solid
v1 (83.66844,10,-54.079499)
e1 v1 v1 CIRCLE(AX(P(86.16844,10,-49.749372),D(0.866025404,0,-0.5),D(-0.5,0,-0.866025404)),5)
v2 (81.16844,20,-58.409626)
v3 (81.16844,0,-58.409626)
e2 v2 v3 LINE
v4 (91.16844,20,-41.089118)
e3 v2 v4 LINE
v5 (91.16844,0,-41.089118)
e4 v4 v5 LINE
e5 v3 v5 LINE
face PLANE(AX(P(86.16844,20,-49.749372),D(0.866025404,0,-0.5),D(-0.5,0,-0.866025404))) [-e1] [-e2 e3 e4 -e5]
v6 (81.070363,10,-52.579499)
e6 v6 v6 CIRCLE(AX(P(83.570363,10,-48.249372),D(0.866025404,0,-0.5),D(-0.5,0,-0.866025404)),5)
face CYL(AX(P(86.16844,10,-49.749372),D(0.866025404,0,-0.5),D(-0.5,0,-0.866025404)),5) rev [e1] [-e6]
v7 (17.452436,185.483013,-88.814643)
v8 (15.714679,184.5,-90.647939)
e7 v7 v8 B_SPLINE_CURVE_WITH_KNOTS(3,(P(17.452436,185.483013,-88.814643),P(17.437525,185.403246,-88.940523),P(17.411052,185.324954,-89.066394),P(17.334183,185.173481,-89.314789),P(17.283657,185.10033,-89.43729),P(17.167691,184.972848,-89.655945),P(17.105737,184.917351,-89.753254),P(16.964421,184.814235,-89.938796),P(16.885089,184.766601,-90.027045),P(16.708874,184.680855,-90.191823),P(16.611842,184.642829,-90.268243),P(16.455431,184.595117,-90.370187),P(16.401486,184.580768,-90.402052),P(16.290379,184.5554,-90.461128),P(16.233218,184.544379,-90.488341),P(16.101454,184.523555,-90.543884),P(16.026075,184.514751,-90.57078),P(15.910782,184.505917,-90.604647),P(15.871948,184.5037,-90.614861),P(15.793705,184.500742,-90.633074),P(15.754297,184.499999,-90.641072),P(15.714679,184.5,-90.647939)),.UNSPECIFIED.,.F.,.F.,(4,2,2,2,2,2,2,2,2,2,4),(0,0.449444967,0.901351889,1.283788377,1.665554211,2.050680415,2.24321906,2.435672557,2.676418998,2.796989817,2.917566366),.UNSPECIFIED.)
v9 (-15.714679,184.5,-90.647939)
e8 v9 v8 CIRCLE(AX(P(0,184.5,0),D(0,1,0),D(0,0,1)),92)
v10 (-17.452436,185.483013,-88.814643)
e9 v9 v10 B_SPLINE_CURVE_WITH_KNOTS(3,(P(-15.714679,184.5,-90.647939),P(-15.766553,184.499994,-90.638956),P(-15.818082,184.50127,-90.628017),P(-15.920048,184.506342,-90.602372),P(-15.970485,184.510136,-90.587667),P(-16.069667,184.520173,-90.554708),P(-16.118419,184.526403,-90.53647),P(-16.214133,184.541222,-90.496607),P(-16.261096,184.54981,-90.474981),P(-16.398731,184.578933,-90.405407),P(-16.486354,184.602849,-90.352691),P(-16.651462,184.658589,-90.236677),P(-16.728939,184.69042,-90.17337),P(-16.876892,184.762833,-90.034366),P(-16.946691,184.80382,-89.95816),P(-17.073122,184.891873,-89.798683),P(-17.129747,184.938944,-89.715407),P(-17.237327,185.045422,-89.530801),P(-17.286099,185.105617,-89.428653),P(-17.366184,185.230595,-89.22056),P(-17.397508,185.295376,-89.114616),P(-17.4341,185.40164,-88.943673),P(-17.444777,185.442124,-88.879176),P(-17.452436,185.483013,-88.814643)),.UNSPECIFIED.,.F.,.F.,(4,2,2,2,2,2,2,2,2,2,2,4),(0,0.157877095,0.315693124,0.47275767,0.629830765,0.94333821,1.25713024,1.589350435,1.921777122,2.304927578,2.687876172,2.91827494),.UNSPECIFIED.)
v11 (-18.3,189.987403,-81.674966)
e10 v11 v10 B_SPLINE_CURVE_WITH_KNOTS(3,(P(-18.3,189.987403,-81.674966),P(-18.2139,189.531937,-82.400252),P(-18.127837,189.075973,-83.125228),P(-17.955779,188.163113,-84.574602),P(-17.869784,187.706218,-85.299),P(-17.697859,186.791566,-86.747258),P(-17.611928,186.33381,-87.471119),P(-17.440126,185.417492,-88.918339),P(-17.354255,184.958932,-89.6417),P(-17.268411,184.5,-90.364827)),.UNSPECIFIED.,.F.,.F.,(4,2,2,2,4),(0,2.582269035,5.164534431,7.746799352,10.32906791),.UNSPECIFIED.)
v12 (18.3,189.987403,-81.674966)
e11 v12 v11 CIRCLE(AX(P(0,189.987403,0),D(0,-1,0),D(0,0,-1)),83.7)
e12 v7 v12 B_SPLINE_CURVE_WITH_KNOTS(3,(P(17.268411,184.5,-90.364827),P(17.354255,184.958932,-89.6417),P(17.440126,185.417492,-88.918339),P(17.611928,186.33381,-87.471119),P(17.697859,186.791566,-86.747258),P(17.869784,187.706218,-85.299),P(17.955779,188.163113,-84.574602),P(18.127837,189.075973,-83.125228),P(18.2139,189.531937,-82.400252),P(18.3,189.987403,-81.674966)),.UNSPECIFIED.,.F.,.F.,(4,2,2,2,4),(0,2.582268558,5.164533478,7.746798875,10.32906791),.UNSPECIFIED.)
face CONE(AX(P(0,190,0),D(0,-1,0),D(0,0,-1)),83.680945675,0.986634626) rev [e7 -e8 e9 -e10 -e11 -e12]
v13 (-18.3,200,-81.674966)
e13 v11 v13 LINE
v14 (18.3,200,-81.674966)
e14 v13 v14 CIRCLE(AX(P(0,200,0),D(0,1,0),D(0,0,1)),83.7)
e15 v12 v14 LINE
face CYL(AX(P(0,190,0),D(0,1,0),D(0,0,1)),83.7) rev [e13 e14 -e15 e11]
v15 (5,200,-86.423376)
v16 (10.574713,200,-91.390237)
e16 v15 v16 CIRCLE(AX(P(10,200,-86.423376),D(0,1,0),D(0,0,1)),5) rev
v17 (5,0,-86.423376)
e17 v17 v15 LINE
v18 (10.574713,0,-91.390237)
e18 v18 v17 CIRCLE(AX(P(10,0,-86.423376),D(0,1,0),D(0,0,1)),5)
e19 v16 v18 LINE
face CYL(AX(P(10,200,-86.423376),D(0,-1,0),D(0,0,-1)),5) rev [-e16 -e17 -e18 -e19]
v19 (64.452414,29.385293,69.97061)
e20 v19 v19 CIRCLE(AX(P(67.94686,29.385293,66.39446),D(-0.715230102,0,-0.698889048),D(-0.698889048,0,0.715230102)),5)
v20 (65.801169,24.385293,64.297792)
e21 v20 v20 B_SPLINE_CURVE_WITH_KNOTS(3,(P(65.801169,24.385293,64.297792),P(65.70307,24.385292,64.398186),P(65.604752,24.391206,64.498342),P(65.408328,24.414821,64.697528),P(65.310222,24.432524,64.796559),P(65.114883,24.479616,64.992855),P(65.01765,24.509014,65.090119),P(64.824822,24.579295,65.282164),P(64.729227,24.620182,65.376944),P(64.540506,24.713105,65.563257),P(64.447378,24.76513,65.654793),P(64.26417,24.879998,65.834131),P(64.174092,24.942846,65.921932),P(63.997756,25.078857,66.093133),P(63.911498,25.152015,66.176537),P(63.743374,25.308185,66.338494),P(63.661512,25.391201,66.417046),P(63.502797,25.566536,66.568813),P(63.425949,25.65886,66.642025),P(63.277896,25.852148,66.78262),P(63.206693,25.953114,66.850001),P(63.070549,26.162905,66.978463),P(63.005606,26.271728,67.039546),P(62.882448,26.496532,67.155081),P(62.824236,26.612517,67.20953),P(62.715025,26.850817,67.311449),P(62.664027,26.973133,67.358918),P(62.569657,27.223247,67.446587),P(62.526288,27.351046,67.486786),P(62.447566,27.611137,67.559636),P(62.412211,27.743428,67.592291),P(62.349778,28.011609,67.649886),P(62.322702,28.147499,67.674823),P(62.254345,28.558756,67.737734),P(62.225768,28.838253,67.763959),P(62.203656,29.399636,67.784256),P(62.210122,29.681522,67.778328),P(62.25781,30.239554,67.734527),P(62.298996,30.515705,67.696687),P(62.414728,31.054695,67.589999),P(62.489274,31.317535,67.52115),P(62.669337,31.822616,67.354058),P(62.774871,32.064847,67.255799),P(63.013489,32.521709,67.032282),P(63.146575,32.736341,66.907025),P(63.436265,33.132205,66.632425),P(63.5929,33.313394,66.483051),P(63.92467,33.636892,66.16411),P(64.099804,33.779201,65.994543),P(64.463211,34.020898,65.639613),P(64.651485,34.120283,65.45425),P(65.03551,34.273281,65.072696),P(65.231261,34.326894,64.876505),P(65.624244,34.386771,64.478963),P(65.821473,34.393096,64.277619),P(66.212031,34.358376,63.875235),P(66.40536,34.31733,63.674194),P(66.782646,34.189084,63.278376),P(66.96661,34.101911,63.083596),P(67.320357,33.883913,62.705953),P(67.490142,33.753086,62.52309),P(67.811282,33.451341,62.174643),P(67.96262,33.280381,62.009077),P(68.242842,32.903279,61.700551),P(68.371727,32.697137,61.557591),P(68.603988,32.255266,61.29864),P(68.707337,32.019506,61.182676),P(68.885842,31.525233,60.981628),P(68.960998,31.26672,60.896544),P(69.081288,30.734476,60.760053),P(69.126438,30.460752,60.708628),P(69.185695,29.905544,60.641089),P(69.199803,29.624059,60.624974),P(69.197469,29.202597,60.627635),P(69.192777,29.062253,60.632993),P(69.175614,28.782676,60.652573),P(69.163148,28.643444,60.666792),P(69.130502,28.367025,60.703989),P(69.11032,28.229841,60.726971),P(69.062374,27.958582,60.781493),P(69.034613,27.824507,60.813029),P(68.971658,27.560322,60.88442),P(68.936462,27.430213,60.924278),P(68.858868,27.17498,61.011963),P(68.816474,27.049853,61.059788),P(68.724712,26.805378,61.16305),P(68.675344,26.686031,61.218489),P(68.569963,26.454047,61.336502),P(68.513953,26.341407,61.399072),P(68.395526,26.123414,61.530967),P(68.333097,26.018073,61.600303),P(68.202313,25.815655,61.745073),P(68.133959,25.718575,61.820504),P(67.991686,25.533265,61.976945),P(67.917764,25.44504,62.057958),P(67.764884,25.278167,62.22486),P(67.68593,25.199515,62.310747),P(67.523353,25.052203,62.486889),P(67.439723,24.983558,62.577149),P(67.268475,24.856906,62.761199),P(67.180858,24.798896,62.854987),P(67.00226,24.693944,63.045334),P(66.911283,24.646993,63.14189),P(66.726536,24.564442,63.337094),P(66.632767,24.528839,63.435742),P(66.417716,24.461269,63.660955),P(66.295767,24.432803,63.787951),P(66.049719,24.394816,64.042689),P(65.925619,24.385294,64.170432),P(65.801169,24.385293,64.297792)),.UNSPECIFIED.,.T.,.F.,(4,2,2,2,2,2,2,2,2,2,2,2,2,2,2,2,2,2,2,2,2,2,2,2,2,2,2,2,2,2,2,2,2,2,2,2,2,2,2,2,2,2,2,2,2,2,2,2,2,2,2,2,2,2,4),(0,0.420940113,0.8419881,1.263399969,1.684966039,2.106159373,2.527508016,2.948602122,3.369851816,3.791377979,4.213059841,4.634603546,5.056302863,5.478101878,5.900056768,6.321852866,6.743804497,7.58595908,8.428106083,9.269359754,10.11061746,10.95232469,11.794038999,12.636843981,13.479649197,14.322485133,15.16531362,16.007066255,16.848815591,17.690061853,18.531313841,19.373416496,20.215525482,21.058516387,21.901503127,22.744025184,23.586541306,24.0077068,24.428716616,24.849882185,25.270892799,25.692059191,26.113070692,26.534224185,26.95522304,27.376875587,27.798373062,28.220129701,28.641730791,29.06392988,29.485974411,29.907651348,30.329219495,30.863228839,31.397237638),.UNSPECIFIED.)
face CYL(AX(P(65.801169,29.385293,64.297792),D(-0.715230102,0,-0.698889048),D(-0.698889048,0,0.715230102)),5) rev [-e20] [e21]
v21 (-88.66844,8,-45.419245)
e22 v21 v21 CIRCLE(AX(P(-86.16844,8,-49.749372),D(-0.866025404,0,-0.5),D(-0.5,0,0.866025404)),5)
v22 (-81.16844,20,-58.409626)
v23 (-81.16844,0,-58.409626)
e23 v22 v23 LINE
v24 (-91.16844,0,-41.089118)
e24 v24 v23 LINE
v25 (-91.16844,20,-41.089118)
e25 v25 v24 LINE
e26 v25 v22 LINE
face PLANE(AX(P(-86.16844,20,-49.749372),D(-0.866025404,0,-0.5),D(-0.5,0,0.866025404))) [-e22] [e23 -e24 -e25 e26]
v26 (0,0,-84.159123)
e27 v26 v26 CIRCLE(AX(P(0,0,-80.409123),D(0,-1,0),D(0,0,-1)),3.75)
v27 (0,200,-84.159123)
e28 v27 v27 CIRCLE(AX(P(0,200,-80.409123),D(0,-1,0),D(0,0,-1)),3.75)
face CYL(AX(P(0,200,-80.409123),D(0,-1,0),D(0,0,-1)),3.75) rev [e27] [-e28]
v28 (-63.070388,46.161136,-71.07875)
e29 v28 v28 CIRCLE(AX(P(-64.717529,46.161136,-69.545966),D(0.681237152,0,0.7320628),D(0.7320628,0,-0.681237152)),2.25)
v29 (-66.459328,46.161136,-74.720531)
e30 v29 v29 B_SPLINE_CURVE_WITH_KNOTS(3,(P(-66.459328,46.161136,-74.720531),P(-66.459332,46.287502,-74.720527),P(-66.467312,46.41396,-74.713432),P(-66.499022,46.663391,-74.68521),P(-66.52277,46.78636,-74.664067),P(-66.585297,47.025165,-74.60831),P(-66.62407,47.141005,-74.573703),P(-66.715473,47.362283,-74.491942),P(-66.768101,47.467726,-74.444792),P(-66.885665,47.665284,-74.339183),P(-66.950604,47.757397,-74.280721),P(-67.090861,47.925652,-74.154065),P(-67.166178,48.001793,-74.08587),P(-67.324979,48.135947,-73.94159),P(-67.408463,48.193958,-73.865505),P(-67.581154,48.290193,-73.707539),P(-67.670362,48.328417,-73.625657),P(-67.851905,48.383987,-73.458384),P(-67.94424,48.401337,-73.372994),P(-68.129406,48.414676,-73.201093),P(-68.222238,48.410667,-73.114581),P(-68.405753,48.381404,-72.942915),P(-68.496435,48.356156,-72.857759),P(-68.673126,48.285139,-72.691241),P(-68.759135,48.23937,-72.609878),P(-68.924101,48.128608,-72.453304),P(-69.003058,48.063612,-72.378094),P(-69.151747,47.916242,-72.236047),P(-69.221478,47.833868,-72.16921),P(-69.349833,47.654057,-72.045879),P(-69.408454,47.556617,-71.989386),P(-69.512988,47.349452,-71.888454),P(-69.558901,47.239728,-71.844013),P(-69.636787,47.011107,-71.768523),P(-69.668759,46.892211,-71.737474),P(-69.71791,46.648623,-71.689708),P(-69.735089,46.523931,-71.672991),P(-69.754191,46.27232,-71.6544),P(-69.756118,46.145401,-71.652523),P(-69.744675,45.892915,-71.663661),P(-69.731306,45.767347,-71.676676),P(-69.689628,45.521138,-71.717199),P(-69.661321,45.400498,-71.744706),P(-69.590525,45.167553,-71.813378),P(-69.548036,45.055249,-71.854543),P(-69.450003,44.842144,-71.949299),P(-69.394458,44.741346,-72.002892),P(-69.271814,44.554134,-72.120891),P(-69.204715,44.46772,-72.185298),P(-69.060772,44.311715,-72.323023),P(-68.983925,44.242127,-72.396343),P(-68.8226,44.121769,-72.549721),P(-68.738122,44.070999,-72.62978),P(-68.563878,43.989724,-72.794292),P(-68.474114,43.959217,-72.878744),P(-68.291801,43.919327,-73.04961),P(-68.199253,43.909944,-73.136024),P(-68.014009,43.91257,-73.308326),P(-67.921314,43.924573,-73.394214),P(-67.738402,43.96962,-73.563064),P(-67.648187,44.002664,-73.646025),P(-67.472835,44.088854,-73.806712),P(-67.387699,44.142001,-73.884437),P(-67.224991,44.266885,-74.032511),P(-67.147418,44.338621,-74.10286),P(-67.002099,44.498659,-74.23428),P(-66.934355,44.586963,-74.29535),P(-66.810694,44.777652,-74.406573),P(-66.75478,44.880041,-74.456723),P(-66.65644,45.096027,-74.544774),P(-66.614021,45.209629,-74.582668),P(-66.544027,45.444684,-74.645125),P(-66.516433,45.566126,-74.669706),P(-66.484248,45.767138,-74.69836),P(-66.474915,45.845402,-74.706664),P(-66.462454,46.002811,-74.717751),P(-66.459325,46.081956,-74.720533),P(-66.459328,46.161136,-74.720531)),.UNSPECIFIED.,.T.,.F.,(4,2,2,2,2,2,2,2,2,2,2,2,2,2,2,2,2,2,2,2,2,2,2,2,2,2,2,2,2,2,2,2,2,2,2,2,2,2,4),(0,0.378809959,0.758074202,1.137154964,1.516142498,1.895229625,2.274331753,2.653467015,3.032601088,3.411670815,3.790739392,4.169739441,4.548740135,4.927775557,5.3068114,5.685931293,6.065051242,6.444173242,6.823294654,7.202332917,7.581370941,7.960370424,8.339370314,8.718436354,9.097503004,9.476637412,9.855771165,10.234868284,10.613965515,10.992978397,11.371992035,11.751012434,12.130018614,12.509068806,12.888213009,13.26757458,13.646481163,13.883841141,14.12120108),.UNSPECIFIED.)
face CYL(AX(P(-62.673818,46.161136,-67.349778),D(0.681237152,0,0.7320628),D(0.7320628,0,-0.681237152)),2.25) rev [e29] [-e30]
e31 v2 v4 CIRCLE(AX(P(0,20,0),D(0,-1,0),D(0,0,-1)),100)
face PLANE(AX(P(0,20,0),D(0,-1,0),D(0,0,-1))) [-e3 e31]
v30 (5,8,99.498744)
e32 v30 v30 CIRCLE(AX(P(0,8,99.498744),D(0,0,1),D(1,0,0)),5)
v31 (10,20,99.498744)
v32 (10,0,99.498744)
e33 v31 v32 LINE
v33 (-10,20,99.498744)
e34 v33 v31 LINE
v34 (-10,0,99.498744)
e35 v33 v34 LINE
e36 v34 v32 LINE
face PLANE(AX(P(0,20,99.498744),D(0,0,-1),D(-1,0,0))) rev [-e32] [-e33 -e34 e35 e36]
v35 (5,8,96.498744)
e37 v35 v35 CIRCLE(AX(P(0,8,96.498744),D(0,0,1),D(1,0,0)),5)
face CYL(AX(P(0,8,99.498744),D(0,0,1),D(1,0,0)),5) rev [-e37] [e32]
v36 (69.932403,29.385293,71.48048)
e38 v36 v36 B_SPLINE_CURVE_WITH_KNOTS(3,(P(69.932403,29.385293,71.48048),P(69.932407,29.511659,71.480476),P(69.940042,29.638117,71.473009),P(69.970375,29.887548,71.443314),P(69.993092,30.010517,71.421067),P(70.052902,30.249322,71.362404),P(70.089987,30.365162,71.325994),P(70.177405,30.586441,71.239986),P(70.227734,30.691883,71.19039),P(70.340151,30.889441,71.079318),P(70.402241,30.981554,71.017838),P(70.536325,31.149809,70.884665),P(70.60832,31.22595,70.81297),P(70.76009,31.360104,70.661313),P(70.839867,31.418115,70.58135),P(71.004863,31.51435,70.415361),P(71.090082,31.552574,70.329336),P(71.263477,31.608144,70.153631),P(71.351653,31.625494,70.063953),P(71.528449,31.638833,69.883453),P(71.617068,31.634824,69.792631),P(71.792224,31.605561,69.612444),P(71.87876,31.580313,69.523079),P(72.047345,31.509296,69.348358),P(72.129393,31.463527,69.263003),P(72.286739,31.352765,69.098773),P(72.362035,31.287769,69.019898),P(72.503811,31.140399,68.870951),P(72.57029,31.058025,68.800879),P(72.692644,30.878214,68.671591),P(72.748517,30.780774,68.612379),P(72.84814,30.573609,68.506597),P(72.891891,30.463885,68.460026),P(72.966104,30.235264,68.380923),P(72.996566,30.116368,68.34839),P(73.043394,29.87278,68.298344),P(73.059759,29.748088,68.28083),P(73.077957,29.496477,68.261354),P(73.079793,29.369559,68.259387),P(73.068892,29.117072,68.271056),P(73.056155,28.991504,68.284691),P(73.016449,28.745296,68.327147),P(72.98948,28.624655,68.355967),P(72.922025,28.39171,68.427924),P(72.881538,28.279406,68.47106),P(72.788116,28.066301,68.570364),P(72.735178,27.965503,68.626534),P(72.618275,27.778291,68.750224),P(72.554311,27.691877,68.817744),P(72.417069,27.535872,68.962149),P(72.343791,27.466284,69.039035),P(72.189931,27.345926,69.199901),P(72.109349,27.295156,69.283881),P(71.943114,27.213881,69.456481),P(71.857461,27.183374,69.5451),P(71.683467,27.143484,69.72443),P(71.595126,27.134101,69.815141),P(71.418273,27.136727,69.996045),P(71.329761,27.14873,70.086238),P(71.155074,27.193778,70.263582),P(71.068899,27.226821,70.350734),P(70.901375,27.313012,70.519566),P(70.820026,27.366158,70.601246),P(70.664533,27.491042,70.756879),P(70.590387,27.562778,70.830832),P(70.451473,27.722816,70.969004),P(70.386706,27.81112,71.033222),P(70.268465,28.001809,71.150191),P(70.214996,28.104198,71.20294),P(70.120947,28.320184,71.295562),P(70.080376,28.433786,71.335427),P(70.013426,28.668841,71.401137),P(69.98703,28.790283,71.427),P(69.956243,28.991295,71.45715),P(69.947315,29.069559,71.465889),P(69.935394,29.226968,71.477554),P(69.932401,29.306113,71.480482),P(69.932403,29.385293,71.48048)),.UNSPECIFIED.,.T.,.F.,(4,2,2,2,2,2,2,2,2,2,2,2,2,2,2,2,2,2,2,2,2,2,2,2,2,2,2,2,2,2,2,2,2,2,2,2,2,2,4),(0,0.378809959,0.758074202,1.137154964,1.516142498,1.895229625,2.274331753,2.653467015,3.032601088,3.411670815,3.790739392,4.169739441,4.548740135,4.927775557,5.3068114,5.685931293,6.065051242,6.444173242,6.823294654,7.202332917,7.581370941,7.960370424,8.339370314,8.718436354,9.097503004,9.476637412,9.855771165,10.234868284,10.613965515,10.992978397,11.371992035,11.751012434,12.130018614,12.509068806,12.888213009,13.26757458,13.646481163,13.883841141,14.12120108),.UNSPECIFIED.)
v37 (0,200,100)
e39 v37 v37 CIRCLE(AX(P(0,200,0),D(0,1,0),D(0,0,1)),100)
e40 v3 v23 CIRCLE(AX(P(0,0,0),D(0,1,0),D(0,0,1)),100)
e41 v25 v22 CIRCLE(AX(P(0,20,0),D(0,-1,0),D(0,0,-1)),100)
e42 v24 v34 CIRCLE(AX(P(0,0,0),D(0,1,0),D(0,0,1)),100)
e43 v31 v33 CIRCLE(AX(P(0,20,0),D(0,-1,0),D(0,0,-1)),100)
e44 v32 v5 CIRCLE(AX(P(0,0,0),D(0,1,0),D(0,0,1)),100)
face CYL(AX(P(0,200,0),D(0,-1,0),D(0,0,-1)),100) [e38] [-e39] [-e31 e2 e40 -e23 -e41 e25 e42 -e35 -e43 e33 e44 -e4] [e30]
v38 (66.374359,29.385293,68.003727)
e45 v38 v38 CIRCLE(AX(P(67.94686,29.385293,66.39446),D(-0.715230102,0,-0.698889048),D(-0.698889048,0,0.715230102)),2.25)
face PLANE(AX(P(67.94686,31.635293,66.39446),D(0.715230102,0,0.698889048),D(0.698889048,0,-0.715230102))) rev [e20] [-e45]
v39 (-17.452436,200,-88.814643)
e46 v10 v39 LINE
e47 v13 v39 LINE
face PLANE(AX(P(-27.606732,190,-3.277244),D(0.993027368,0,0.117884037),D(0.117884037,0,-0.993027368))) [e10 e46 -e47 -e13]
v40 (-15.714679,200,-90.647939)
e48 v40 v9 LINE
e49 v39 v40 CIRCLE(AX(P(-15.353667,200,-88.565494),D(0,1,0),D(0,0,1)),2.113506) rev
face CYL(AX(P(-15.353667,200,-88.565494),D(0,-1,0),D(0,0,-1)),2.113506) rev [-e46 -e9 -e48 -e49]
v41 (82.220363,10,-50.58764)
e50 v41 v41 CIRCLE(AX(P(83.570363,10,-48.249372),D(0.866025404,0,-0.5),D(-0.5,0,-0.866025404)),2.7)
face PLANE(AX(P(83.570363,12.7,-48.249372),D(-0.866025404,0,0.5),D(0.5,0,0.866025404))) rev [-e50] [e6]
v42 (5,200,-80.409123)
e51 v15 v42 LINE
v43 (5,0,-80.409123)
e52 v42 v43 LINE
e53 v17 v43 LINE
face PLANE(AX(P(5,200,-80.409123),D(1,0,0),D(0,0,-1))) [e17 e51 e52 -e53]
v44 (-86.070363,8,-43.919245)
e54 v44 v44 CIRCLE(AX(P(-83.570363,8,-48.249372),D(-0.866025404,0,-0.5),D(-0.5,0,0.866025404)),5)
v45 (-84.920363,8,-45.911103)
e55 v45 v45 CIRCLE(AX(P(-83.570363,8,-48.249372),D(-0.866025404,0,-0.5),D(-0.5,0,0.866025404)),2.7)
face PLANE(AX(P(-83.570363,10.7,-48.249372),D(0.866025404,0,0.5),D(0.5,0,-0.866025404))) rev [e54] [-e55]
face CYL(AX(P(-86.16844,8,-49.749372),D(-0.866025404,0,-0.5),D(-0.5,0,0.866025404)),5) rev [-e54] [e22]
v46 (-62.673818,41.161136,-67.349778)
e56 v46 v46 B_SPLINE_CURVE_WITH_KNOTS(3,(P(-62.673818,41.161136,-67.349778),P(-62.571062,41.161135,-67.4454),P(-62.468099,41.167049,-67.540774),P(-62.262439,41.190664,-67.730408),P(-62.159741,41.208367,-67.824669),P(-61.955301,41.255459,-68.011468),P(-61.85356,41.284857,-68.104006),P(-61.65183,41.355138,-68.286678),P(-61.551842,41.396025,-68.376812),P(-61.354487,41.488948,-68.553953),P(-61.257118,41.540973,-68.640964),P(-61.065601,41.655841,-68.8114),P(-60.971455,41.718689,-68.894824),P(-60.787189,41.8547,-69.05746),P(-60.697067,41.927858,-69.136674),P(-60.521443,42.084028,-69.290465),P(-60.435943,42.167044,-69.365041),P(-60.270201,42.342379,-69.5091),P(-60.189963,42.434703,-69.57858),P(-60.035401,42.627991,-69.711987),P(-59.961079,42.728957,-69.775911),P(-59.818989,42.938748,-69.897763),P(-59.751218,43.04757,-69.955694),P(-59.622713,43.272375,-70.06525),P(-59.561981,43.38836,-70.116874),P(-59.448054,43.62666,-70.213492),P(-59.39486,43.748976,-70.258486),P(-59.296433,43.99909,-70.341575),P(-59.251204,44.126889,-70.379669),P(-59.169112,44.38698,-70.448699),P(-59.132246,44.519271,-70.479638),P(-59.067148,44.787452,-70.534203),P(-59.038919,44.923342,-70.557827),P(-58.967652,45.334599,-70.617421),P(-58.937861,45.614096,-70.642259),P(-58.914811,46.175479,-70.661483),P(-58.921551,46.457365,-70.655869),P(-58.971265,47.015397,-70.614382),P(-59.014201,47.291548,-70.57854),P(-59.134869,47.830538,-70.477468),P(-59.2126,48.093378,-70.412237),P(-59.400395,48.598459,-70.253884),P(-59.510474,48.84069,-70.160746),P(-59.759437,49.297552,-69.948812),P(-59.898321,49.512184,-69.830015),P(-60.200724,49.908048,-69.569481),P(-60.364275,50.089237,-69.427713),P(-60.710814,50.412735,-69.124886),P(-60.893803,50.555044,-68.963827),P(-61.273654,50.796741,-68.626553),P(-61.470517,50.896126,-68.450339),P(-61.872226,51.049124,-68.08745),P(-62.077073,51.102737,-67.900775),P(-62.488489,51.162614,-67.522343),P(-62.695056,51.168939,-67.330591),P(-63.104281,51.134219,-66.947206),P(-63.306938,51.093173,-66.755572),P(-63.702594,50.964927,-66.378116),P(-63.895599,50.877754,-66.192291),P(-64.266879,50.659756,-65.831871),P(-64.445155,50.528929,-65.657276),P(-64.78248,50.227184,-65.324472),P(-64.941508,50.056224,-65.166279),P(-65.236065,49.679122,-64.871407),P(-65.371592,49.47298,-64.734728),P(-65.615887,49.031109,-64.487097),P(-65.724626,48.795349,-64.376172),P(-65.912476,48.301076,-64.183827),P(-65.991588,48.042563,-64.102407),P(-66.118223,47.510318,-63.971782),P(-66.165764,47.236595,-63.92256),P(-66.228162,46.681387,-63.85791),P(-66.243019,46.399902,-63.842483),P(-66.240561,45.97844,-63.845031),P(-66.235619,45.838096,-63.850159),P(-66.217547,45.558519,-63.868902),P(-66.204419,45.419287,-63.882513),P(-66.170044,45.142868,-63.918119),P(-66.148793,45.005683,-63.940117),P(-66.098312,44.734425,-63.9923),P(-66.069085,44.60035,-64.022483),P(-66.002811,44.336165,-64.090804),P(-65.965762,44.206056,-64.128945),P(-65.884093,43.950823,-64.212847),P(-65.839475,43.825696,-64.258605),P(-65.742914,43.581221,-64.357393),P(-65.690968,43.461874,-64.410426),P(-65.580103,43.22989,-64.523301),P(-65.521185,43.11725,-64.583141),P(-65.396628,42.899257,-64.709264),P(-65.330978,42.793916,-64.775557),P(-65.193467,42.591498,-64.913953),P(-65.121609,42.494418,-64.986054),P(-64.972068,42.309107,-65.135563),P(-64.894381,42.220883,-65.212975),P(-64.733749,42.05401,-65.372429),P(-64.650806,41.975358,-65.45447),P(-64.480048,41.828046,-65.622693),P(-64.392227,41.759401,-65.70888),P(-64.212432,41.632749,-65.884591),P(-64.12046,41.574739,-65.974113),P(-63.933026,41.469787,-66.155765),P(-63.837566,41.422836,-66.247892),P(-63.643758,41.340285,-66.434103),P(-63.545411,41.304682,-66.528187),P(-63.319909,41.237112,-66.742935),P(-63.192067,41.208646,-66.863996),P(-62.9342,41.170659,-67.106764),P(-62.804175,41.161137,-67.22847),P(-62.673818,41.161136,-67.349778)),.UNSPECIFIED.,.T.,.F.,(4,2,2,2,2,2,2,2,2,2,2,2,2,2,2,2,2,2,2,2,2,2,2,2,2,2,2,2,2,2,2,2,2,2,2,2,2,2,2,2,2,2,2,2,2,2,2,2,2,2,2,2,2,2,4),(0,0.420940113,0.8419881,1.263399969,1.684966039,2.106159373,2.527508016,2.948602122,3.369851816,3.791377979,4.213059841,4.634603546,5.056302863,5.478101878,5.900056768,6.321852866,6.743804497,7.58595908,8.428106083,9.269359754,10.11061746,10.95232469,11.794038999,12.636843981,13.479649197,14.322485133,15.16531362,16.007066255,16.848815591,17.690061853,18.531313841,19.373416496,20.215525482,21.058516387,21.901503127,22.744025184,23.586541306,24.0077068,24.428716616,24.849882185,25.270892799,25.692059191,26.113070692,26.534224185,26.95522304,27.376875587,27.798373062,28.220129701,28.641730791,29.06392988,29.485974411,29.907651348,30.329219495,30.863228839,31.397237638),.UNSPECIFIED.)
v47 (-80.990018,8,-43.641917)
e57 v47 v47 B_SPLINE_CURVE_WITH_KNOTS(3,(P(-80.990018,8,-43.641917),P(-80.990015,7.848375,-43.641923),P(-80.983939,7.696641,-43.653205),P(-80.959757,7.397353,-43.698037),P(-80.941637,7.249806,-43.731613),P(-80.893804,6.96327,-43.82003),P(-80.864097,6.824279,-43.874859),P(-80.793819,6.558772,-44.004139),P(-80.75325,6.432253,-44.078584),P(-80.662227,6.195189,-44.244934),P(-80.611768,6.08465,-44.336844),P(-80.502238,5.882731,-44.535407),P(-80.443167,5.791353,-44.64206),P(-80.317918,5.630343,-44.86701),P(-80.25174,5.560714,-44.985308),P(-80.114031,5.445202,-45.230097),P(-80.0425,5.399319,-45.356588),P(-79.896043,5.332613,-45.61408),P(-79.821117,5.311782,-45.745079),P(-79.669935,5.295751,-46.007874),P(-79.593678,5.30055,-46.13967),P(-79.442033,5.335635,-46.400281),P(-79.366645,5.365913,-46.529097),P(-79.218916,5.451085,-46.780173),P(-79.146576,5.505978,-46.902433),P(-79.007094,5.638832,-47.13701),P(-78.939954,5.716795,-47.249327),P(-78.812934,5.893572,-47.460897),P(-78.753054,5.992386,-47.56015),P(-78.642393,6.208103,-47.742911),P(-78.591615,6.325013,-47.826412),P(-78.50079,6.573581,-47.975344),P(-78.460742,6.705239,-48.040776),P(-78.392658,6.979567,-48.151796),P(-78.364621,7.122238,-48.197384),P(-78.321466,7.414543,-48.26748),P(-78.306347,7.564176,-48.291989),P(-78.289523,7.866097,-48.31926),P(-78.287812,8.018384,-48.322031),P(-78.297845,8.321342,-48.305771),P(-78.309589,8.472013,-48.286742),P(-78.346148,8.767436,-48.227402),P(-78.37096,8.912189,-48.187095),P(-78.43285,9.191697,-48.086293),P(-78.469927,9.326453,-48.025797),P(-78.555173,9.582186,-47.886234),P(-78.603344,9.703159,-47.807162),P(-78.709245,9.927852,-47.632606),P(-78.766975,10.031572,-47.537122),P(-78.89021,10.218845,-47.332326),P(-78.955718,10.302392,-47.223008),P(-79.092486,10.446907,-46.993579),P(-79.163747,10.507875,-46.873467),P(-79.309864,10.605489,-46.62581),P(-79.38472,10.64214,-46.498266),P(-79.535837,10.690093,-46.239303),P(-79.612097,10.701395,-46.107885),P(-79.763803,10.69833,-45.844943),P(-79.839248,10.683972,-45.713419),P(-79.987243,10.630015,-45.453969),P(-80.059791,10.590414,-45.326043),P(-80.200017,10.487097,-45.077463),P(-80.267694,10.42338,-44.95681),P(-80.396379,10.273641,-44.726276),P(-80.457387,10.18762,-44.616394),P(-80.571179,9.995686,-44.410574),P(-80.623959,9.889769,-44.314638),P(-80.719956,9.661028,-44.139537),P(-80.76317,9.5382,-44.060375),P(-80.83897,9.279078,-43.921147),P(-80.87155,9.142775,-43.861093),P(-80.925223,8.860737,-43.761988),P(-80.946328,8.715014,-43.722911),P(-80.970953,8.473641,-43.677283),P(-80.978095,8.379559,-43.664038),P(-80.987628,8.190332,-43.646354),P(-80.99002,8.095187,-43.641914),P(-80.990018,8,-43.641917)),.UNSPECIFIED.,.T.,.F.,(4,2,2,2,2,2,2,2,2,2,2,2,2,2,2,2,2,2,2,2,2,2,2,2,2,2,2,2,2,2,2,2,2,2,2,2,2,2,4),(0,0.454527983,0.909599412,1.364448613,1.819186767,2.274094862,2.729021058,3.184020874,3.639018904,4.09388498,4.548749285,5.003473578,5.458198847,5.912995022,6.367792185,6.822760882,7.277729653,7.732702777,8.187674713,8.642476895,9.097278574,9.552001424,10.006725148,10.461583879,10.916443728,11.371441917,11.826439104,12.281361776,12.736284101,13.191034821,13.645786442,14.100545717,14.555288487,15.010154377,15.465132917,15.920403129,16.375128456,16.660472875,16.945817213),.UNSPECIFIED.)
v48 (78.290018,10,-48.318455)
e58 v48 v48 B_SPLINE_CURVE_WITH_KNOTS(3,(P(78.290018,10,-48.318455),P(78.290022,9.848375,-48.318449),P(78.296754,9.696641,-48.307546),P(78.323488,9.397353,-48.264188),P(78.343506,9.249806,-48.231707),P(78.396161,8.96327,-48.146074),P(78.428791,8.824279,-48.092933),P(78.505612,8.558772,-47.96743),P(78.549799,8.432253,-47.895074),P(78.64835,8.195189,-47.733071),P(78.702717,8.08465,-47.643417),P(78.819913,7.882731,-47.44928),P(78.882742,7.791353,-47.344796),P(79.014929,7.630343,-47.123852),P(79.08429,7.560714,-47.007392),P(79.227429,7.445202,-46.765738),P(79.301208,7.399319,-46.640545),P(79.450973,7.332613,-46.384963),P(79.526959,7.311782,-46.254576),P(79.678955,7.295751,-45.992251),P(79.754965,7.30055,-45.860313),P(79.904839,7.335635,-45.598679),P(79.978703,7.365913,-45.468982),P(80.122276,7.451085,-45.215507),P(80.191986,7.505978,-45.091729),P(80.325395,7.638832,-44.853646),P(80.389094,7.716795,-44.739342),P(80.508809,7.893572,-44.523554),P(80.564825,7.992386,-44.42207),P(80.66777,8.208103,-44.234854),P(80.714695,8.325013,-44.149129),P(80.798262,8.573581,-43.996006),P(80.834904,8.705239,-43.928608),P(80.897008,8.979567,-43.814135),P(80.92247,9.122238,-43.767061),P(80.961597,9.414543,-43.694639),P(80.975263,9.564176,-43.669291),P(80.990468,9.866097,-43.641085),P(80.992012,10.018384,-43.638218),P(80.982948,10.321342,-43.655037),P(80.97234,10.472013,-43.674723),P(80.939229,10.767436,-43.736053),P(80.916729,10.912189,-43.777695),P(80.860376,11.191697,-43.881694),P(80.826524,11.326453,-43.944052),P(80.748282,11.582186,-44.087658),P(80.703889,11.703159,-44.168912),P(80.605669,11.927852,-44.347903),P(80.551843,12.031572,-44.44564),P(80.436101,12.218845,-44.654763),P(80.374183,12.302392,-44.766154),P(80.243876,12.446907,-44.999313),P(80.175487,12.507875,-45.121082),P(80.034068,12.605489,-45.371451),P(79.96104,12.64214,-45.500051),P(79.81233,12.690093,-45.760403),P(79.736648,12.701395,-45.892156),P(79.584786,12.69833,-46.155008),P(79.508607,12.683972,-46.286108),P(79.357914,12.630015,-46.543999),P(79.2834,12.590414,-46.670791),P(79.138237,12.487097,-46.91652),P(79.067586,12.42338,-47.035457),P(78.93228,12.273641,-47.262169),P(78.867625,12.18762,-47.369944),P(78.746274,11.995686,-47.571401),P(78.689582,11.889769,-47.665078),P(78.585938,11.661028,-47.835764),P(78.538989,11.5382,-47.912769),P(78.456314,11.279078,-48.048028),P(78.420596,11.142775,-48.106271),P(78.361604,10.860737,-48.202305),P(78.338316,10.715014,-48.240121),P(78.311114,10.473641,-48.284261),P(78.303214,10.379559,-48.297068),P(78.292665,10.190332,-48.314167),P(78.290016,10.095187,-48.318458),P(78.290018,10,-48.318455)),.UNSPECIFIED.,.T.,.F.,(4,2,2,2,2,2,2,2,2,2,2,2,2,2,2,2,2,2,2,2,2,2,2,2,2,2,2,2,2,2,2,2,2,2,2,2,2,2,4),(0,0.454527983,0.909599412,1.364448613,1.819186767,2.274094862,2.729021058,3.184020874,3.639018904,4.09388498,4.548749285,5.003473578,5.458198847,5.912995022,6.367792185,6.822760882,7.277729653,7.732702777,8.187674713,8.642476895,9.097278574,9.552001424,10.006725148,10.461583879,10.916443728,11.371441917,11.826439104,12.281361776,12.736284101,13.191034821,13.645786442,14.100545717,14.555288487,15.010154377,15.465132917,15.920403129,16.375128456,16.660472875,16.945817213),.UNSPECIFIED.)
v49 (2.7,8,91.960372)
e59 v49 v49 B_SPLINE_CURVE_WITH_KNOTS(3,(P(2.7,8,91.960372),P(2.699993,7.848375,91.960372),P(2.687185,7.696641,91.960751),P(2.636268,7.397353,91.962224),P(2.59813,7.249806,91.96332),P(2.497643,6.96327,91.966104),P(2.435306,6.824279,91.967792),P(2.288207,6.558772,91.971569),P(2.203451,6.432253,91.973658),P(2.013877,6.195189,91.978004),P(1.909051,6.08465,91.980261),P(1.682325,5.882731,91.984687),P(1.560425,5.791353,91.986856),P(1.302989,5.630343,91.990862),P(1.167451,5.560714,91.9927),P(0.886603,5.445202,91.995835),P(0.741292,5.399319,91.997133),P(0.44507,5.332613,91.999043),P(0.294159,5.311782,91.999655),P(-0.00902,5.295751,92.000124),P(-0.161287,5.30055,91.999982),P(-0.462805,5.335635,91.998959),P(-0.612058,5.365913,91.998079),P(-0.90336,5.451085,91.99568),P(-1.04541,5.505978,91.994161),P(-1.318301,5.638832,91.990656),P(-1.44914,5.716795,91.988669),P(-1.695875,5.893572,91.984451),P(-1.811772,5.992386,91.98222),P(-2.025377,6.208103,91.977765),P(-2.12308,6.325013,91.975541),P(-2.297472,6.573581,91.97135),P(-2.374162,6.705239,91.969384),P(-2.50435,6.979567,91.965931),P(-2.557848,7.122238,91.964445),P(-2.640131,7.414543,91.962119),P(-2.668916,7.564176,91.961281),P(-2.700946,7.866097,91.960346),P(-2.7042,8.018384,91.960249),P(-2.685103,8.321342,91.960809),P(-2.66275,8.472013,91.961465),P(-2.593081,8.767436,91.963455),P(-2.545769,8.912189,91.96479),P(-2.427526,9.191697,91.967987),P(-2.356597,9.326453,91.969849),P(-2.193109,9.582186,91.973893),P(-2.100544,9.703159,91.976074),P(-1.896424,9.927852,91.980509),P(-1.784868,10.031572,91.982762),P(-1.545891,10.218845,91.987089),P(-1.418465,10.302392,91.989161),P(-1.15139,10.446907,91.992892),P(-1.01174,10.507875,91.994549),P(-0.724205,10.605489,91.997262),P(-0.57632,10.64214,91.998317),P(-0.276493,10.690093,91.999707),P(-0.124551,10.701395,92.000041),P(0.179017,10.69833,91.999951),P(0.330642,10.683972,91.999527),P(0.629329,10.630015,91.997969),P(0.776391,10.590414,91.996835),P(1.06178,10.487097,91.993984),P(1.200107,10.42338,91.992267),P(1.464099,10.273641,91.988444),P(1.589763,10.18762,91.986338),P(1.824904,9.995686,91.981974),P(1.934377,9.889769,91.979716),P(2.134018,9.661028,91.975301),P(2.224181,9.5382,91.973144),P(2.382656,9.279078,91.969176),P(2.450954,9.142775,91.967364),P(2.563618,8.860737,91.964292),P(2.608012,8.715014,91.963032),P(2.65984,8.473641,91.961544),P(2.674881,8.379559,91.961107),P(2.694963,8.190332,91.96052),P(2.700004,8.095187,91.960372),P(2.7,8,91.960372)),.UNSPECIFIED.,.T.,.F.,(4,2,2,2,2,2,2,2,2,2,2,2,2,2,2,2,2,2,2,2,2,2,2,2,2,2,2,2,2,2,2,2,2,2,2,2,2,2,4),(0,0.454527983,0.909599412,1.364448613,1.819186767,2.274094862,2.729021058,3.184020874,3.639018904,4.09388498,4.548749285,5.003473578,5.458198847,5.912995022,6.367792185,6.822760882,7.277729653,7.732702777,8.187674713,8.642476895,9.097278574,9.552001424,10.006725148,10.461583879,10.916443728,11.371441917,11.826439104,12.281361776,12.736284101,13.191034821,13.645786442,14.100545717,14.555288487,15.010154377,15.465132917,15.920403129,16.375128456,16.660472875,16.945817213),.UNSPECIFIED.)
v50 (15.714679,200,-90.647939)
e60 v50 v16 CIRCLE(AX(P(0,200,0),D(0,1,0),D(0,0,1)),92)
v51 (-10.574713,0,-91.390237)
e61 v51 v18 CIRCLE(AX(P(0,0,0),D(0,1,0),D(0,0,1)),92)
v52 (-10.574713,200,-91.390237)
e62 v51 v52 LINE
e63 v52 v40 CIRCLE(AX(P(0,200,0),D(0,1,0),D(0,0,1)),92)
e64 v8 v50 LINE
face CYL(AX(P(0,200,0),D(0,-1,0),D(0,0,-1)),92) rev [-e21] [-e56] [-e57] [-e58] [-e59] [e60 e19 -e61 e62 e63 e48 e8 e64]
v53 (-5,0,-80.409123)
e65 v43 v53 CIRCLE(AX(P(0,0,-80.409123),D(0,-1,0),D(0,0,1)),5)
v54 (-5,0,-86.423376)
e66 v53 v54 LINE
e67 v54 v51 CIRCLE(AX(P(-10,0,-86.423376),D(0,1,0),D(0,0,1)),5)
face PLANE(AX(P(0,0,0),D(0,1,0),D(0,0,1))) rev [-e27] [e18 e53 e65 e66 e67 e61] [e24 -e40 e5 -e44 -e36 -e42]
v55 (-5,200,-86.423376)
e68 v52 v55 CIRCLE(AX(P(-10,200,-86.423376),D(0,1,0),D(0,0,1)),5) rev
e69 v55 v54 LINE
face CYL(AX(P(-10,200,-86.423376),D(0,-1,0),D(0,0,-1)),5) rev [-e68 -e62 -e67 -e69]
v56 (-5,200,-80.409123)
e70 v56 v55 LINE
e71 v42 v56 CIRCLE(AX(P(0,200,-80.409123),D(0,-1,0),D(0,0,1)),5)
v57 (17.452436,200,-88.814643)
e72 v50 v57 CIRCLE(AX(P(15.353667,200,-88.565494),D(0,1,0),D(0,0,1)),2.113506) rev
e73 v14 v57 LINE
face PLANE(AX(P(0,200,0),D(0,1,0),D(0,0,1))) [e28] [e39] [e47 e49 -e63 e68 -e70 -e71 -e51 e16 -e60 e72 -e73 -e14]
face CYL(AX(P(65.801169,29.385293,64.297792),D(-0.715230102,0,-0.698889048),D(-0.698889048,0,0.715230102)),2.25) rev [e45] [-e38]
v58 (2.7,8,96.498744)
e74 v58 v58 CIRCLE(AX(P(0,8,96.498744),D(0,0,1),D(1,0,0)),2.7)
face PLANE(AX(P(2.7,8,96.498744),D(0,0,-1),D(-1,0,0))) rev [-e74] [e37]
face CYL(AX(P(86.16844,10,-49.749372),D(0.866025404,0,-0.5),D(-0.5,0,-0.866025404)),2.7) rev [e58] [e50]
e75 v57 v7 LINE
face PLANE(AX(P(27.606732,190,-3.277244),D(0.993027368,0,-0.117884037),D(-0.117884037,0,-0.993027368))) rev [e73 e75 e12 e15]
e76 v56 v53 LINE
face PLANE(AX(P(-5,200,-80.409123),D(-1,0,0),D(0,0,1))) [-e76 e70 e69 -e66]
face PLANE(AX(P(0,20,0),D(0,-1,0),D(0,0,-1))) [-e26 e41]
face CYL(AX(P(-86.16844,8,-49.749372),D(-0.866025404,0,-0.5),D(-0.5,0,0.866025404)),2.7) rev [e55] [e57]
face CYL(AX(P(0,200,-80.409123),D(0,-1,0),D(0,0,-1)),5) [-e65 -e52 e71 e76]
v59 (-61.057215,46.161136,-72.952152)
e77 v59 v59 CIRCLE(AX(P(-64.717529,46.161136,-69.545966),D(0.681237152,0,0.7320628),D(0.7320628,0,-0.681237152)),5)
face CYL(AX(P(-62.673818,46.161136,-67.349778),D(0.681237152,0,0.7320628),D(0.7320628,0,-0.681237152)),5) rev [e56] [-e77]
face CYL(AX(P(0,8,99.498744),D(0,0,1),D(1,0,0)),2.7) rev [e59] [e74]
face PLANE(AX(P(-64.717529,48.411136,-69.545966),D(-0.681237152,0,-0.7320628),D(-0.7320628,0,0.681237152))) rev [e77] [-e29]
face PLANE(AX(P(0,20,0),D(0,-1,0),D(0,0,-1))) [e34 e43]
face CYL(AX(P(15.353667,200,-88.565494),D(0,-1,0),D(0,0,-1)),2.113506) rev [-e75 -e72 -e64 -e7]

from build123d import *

# Parameters (mm, degrees)
SCHIZZO1_R                                           = 100
ESTRUSIONE_ESTRUSIONE1_DEPTH                         = 200
RACCORDO1_R                                          = 5
ESTRUSIONE_ESTRUSIONE2_START                         = -10
ESTRUSIONE_ESTRUSIONE2_DEPTH                         = 10
SMUSSO1_START                                        = 184.4999999
SMUSSO1_DEPTH                                        = 5.5000001
SMUSSO1_2_ANGLE                                      = 338.362808
RACCORDO2_R                                          = 2.113506
SCHIZZO6_R                                           = 3.75
TAGLIO_ESTRUSIONE1_DEPTH                             = 200
TAGLIO_ESTRUSIONE2_DEPTH                             = 20
FORO_LAMATO_PER_BULLONE_M5_A_TESTA_ESAGO_D           = 5.4
FORO_LAMATO_PER_BULLONE_M5_A_TESTA_ESAGO_DEPTH       = 30
FORO_LAMATO_PER_BULLONE_M5_A_TESTA_ESAGO_CBORE_D     = 10
FORO_LAMATO_PER_BULLONE_M5_A_TESTA_ESAGO_CBORE_DEPTH = 3
FORO_LAMATO_PER_BULLONE_M5_A_TESTA_ESAGO_TIP         = 1.622323671
FORO_LAMATO_PER_BULLONE_M5_A_TESTA_E_2_D             = 5.4
FORO_LAMATO_PER_BULLONE_M5_A_TESTA_E_2_DEPTH         = 30
FORO_LAMATO_PER_BULLONE_M5_A_TESTA_E_2_CBORE_D       = 10
FORO_LAMATO_PER_BULLONE_M5_A_TESTA_E_2_CBORE_DEPTH   = 3
FORO_LAMATO_PER_BULLONE_M5_A_TESTA_E_2_TIP           = 1.622323671
FORO_LAMATO_PER_BULLONE_M5_A_TESTA_E_3_D             = 5.4
FORO_LAMATO_PER_BULLONE_M5_A_TESTA_E_3_DEPTH         = 30
FORO_LAMATO_PER_BULLONE_M5_A_TESTA_E_3_CBORE_D       = 10
FORO_LAMATO_PER_BULLONE_M5_A_TESTA_E_3_CBORE_DEPTH   = 3
FORO_LAMATO_PER_BULLONE_M5_A_TESTA_E_3_TIP           = 1.622323671
FORO_LAMATO_PER_VITE_M4_A_TESTA_ESAGONAL_D           = 4.5
FORO_LAMATO_PER_VITE_M4_A_TESTA_ESAGONAL_DEPTH       = 30
FORO_LAMATO_PER_VITE_M4_A_TESTA_ESAGONAL_CBORE_D     = 10
FORO_LAMATO_PER_VITE_M4_A_TESTA_ESAGONAL_CBORE_DEPTH = 3
FORO_LAMATO_PER_VITE_M4_A_TESTA_ESAGONAL_TIP         = 1.351936393
FORO_LAMATO_PER_VITE_M4_A_TESTA_ESAG_2_D             = 4.5
FORO_LAMATO_PER_VITE_M4_A_TESTA_ESAG_2_DEPTH         = 30
FORO_LAMATO_PER_VITE_M4_A_TESTA_ESAG_2_CBORE_D       = 10
FORO_LAMATO_PER_VITE_M4_A_TESTA_ESAG_2_CBORE_DEPTH   = 3
FORO_LAMATO_PER_VITE_M4_A_TESTA_ESAG_2_TIP           = 1.351936393


with BuildPart() as part:
    # Schizzo1 → Estrusione-Estrusione1 (new body)
    with BuildSketch(Plane(origin=(0, 0, 0), x_dir=(1, 0, 0), z_dir=(0, 1, 0))):
        with Locations(Location((0, 0, 0), (0, 0, 270))):
            Circle(SCHIZZO1_R)
        with BuildLine():
            Line((-5, 80.409122957), (-5, 91.864029957))
            ThreePointArc((-5, 91.864029957), (0, -92), (5, 91.864029957))
            Line((5, 91.864029957), (5, 80.409122957))
            ThreePointArc((5, 80.409122957), (0, 75.409122957), (-5, 80.409122957))
        make_face(mode=Mode.SUBTRACT)
    extrude(amount=ESTRUSIONE_ESTRUSIONE1_DEPTH)

    # Raccordo1
    raccordo1_edges = [part.edges().sort_by_distance(p)[0] for p in [
        (-5, 100, -91.864029957),
        (5, 100, -91.864029957),
    ]]
    fillet(raccordo1_edges, radius=RACCORDO1_R)

    # Schizzo2 → Estrusione-Estrusione2 (add)
    with BuildSketch(Plane(origin=(0, 200, 0), x_dir=(1, 0, 0), z_dir=(0, 1, 0)).offset(ESTRUSIONE_ESTRUSIONE2_START)):
        with BuildLine():
            ThreePointArc((18.3, 81.674965565), (0, -83.7), (-18.3, 81.674965565))
            Line((-18.3, 81.674965565), (-17.268411156, 90.364827096))
            ThreePointArc((-17.268411156, 90.364827096), (-58.631502512, -70.89673415), (92, 0))
            ThreePointArc((92, 0), (70.89673415, 58.631502512), (17.268411156, 90.364827096))
            Line((17.268411156, 90.364827096), (18.3, 81.674965565))
        make_face()
    extrude(amount=ESTRUSIONE_ESTRUSIONE2_DEPTH)

    # Smusso1: read off the stored shape, not the designer's step
    # Smusso1 outline → Smusso1 (add)
    with BuildSketch(Plane(origin=(0, 0, 0), x_dir=(1, 0, 0), z_dir=(0, 1, 0)).offset(SMUSSO1_START)):
        with BuildLine():
            Line((17.268411156, 90.364827097), (18.3, 81.674965565))
            ThreePointArc((18.3, 81.674965565), (0, -83.7), (-18.3, 81.674965565))
            Line((-18.3, 81.674965565), (-17.268411156, 90.364827097))
            ThreePointArc((-17.268411156, 90.364827097), (0, -92), (17.268411156, 90.364827097))
        make_face()
    extrude(amount=SMUSSO1_DEPTH)

    # Smusso1 2 outline → Smusso1 2 (revolve, cut)
    with BuildSketch(Plane(origin=(0, 0, 0), x_dir=(-0.18770012126264535, 0, -0.9822263814813712), z_dir=(0.9822263814813712, 0, -0.18770012126264535))):
        Polygon((92, 184.5), (83.7, 189.98740256), (83.7, 184.4999999), align=None)
    revolve(axis=Axis((0, 0, 0), (0, 1, 0)), revolution_arc=SMUSSO1_2_ANGLE, mode=Mode.SUBTRACT)

    # Raccordo2
    raccordo2_edges = [part.edges().sort_by_distance(p)[0] for p in [
        (17.268411156, 195, -90.364827096),
        (-17.268411156, 195, -90.364827096),
    ]]
    fillet(raccordo2_edges, radius=RACCORDO2_R)

    # Schizzo6 → Taglio-Estrusione1 (cut)
    with BuildSketch(Plane.XZ):
        with Locations(Location((0, -80.409122957, 0), (0, 0, 270))):
            Circle(SCHIZZO6_R)
    extrude(amount=-TAGLIO_ESTRUSIONE1_DEPTH, mode=Mode.SUBTRACT)

    # Schizzo7 → Taglio-Estrusione2 (cut)
    with BuildSketch(Plane.XZ):
        with BuildLine():
            ThreePointArc((10, 99.498743711), (0, 100), (-10, 99.498743711))
            Line((-10, 99.498743711), (10, 99.498743711))
        make_face()
        with BuildLine():
            ThreePointArc((81.168439698, -58.409625893), (86.602540378, -50), (91.168439698, -41.089117817))
            Line((91.168439698, -41.089117817), (81.168439698, -58.409625893))
        make_face()
        with BuildLine():
            Line((-81.168439698, -58.409625893), (-91.168439698, -41.089117817))
            ThreePointArc((-91.168439698, -41.089117817), (-86.602540378, -50), (-81.168439698, -58.409625893))
        make_face()
    extrude(amount=-TAGLIO_ESTRUSIONE2_DEPTH, mode=Mode.SUBTRACT)

    # Foro lamato per Bullone M5 a testa esago
    with Locations(Plane(origin=(86.168439698, 0, -49.749371855), x_dir=(-0.4999999999999976, 0, -0.86602540378444), z_dir=(0.8660254037844402, 0, -0.4999999999999977))):
        with Locations((0, 10)):
            CounterBoreHole(FORO_LAMATO_PER_BULLONE_M5_A_TESTA_ESAGO_D / 2, FORO_LAMATO_PER_BULLONE_M5_A_TESTA_ESAGO_CBORE_D / 2, FORO_LAMATO_PER_BULLONE_M5_A_TESTA_ESAGO_CBORE_DEPTH, depth=FORO_LAMATO_PER_BULLONE_M5_A_TESTA_ESAGO_DEPTH)
            with Locations((0, 0, -(FORO_LAMATO_PER_BULLONE_M5_A_TESTA_ESAGO_DEPTH + FORO_LAMATO_PER_BULLONE_M5_A_TESTA_ESAGO_TIP / 2))):  # 118° drill point
                Cone(0, FORO_LAMATO_PER_BULLONE_M5_A_TESTA_ESAGO_D / 2, FORO_LAMATO_PER_BULLONE_M5_A_TESTA_ESAGO_TIP, mode=Mode.SUBTRACT)

    # Foro lamato per Bullone M5 a testa e 2
    with Locations(Plane(origin=(-86.168439698, 0, -49.749371855), x_dir=(-0.5000000000000044, 0, 0.8660254037844362), z_dir=(-0.8660254037844362, 0, -0.5000000000000044))):
        with Locations((0, 8)):
            CounterBoreHole(FORO_LAMATO_PER_BULLONE_M5_A_TESTA_E_2_D / 2, FORO_LAMATO_PER_BULLONE_M5_A_TESTA_E_2_CBORE_D / 2, FORO_LAMATO_PER_BULLONE_M5_A_TESTA_E_2_CBORE_DEPTH, depth=FORO_LAMATO_PER_BULLONE_M5_A_TESTA_E_2_DEPTH)
            with Locations((0, 0, -(FORO_LAMATO_PER_BULLONE_M5_A_TESTA_E_2_DEPTH + FORO_LAMATO_PER_BULLONE_M5_A_TESTA_E_2_TIP / 2))):  # 118° drill point
                Cone(0, FORO_LAMATO_PER_BULLONE_M5_A_TESTA_E_2_D / 2, FORO_LAMATO_PER_BULLONE_M5_A_TESTA_E_2_TIP, mode=Mode.SUBTRACT)

    # Foro lamato per Bullone M5 a testa e 3
    with Locations(Plane.XY.offset(99.498743711)):
        with Locations((0, 8)):
            CounterBoreHole(FORO_LAMATO_PER_BULLONE_M5_A_TESTA_E_3_D / 2, FORO_LAMATO_PER_BULLONE_M5_A_TESTA_E_3_CBORE_D / 2, FORO_LAMATO_PER_BULLONE_M5_A_TESTA_E_3_CBORE_DEPTH, depth=FORO_LAMATO_PER_BULLONE_M5_A_TESTA_E_3_DEPTH)
            with Locations((0, 0, -(FORO_LAMATO_PER_BULLONE_M5_A_TESTA_E_3_DEPTH + FORO_LAMATO_PER_BULLONE_M5_A_TESTA_E_3_TIP / 2))):  # 118° drill point
                Cone(0, FORO_LAMATO_PER_BULLONE_M5_A_TESTA_E_3_D / 2, FORO_LAMATO_PER_BULLONE_M5_A_TESTA_E_3_TIP, mode=Mode.SUBTRACT)

    # Foro lamato per Vite M4 a testa esagonale-1
    with Locations(Plane(origin=(65.801169357, 29.385293, 64.297792429), x_dir=(0.698889048141, 0, -0.715230101707), z_dir=(-0.715230101707, 0, -0.698889048141))):
        with Locations((0, 0)):
            CounterBoreHole(FORO_LAMATO_PER_VITE_M4_A_TESTA_ESAGONAL_D / 2, FORO_LAMATO_PER_VITE_M4_A_TESTA_ESAGONAL_CBORE_D / 2, FORO_LAMATO_PER_VITE_M4_A_TESTA_ESAGONAL_CBORE_DEPTH, depth=FORO_LAMATO_PER_VITE_M4_A_TESTA_ESAGONAL_DEPTH)
            with Locations((0, 0, -(FORO_LAMATO_PER_VITE_M4_A_TESTA_ESAGONAL_DEPTH + FORO_LAMATO_PER_VITE_M4_A_TESTA_ESAGONAL_TIP / 2))):  # 118° drill point
                Cone(0, FORO_LAMATO_PER_VITE_M4_A_TESTA_ESAGONAL_D / 2, FORO_LAMATO_PER_VITE_M4_A_TESTA_ESAGONAL_TIP, mode=Mode.SUBTRACT)

    # Foro lamato per Vite M4 a testa esag 2
    with Locations(Plane(origin=(-62.673817972, 46.161135949, -67.349777585), x_dir=(0.732062968471, 0, -0.68123697066), z_dir=(0.68123697066, 0, 0.732062968471))):
        with Locations((0, 0)):
            CounterBoreHole(FORO_LAMATO_PER_VITE_M4_A_TESTA_ESAG_2_D / 2, FORO_LAMATO_PER_VITE_M4_A_TESTA_ESAG_2_CBORE_D / 2, FORO_LAMATO_PER_VITE_M4_A_TESTA_ESAG_2_CBORE_DEPTH, depth=FORO_LAMATO_PER_VITE_M4_A_TESTA_ESAG_2_DEPTH)
            with Locations((0, 0, -(FORO_LAMATO_PER_VITE_M4_A_TESTA_ESAG_2_DEPTH + FORO_LAMATO_PER_VITE_M4_A_TESTA_ESAG_2_TIP / 2))):  # 118° drill point
                Cone(0, FORO_LAMATO_PER_VITE_M4_A_TESTA_ESAG_2_D / 2, FORO_LAMATO_PER_VITE_M4_A_TESTA_ESAG_2_TIP, mode=Mode.SUBTRACT)


solid = part.part
